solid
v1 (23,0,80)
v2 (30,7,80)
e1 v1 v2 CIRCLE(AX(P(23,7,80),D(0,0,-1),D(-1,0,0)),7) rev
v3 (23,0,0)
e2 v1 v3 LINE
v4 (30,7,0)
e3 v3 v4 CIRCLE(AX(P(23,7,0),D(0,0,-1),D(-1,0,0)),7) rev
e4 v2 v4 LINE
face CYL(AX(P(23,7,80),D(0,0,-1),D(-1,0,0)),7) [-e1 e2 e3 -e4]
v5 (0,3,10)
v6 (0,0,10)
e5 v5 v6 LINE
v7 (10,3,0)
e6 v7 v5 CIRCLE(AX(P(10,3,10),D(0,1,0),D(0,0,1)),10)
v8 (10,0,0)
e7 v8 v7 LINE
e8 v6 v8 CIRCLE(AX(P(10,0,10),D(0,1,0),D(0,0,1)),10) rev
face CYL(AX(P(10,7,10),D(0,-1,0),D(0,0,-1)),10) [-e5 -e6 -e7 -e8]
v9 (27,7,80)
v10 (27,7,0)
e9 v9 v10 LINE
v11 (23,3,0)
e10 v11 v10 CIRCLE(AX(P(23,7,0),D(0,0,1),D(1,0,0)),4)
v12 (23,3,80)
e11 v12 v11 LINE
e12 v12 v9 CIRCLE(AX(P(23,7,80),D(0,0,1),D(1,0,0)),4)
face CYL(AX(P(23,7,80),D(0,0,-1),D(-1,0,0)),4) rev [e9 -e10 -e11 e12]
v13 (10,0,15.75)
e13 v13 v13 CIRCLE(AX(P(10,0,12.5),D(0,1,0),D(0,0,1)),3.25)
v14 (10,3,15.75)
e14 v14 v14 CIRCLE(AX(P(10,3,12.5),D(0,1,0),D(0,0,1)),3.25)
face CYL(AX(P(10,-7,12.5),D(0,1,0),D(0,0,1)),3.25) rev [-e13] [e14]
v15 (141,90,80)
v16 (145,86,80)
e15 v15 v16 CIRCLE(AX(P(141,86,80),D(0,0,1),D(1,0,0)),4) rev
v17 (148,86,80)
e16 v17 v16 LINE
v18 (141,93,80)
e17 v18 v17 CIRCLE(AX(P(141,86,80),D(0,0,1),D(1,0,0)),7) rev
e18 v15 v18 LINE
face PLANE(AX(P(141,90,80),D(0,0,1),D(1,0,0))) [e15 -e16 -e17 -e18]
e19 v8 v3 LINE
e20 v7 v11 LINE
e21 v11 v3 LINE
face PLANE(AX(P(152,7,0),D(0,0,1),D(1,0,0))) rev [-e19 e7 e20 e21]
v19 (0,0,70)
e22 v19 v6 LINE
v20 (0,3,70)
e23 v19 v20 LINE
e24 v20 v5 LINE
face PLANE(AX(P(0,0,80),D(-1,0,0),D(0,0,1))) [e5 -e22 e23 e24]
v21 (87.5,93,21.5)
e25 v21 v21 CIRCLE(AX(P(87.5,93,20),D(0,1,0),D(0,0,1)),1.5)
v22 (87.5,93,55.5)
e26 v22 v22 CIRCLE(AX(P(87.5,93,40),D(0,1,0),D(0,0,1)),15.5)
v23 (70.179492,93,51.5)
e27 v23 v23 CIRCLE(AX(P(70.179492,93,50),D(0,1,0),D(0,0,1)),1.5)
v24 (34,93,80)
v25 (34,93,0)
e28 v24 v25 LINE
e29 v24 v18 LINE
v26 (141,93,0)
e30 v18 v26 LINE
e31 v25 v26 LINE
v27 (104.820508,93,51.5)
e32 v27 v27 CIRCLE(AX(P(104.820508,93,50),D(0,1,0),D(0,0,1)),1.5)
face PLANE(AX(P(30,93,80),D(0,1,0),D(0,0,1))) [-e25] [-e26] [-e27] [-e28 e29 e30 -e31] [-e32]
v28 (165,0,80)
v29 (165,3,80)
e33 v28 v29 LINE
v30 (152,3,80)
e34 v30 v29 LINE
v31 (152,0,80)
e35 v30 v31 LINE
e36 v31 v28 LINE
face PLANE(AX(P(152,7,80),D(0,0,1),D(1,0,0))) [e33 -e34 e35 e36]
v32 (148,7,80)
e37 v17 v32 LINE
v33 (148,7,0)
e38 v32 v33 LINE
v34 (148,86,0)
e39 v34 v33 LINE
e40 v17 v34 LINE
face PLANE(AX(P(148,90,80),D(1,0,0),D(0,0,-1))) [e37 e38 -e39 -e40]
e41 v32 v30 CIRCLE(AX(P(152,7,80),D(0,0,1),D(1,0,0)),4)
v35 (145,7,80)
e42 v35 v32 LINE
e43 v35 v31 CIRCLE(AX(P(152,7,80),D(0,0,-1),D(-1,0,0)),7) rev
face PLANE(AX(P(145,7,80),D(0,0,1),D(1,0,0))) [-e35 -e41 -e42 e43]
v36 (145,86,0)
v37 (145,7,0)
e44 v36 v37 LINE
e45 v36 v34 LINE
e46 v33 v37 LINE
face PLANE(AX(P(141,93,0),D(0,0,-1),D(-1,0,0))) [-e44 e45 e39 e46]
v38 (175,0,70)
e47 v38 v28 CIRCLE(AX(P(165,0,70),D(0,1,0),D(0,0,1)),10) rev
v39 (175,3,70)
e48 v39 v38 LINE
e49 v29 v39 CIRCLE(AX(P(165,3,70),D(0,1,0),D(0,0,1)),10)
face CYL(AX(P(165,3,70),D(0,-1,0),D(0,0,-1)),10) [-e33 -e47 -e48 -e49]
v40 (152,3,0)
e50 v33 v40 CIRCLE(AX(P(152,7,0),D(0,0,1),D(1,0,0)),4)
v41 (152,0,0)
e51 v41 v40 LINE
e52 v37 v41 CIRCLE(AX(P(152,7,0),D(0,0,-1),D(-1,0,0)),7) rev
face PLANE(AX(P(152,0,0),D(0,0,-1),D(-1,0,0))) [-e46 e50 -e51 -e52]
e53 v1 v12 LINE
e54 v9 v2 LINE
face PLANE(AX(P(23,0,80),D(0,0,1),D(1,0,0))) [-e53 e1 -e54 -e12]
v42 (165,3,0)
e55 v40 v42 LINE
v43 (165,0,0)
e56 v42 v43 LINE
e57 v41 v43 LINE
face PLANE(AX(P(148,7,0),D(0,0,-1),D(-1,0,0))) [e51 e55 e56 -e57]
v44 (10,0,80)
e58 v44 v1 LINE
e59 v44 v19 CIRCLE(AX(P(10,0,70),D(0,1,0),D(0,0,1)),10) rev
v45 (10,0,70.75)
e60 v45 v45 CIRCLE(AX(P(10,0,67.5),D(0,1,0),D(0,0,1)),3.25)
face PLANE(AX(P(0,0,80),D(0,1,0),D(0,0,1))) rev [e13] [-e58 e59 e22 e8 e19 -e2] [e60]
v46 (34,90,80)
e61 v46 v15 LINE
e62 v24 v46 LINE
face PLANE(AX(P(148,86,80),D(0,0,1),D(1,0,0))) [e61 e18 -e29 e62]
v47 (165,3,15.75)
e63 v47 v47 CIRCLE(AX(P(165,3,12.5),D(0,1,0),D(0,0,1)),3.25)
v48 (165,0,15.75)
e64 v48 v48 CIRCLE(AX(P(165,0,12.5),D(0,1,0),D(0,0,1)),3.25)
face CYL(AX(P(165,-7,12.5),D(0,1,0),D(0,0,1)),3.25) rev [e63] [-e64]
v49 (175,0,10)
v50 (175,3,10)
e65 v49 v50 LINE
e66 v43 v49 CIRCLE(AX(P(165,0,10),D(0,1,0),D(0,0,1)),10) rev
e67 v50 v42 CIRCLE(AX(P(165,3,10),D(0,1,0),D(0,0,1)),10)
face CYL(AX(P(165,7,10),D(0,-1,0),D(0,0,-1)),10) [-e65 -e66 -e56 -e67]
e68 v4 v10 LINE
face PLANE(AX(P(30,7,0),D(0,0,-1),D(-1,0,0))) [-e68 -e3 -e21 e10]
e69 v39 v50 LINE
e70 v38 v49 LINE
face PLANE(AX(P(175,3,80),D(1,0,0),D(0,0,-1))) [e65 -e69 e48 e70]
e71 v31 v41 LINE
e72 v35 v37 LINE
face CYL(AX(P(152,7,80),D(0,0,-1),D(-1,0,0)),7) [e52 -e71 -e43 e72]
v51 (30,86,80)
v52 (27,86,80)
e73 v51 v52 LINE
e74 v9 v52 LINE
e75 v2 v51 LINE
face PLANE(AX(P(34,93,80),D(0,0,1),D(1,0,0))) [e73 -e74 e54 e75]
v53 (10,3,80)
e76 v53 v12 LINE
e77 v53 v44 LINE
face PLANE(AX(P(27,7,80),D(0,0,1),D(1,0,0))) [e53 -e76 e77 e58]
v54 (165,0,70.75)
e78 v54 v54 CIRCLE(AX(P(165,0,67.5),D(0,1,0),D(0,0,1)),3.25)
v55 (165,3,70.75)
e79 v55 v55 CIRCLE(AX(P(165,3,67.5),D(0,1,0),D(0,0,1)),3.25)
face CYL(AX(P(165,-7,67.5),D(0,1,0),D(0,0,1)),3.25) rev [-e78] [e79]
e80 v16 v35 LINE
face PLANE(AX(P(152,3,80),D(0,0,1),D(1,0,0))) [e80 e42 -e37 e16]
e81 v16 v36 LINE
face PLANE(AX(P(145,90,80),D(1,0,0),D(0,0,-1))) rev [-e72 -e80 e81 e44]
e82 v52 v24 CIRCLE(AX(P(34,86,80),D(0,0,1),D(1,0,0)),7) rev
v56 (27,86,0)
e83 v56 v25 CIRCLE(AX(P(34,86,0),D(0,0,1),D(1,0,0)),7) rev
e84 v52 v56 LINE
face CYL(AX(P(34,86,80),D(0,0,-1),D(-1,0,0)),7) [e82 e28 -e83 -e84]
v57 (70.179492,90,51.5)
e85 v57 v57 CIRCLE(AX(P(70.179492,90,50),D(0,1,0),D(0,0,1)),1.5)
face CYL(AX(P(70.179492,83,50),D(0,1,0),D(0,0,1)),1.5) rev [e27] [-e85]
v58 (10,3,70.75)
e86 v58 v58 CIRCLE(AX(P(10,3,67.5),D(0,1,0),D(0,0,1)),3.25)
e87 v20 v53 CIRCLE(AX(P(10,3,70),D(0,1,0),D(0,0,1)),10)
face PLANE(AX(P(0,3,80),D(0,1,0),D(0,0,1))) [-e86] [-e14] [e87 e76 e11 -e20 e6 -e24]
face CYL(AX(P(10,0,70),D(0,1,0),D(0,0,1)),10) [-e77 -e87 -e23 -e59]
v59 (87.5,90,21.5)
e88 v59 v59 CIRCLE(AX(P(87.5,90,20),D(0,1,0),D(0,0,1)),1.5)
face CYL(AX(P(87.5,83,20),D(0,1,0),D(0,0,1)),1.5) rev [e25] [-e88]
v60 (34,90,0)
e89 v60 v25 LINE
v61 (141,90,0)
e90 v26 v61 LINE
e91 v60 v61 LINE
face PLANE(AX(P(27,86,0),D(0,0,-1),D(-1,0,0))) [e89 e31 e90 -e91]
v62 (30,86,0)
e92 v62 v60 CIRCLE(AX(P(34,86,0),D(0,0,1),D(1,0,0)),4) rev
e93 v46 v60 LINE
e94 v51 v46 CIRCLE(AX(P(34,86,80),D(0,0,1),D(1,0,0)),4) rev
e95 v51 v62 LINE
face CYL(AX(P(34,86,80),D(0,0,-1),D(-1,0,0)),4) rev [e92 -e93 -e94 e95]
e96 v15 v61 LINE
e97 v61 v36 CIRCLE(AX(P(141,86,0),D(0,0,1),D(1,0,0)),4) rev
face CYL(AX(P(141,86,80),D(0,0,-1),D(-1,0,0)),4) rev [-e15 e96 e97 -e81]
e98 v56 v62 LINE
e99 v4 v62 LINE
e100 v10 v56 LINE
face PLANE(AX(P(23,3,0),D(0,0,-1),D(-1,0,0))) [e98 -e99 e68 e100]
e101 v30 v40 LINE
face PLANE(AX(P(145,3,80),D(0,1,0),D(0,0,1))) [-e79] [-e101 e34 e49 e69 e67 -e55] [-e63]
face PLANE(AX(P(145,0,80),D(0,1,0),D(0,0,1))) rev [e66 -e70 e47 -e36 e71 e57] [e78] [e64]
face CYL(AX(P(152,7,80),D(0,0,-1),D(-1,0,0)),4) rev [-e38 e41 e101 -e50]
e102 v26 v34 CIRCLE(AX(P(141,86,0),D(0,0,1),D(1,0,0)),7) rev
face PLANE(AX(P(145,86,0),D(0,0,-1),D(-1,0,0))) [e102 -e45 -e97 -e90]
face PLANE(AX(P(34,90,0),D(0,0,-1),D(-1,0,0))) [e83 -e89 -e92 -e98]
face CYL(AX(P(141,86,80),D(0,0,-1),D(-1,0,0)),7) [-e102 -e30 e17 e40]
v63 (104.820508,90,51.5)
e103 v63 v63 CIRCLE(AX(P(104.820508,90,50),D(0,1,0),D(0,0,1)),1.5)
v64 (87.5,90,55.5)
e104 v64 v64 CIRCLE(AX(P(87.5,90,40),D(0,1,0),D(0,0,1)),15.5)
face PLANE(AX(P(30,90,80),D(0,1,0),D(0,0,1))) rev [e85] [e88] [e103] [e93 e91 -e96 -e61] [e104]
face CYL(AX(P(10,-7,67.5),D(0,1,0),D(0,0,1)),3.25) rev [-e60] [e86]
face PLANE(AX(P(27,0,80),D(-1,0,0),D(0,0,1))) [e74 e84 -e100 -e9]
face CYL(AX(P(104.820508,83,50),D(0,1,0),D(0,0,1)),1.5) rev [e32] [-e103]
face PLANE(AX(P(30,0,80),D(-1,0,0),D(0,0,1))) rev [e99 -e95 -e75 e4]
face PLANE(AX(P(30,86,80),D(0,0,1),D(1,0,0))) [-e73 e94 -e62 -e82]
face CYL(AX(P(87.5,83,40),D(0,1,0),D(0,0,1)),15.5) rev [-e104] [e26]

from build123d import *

# Parameters (mm, degrees)
TABAN_FLAN_1_DEPTH    = 80
IZIM2_R               = 1.5
KES_EKSTR_ZYON1_DEPTH = 10
IZIM3_R               = 15.5
KES_EKSTR_ZYON2_DEPTH = 10
RADYUS1_R             = 10
IZIM4_R               = 3.25
KES_EKSTR_ZYON3_DEPTH = 10


# Read off the part's stored shape, not the designer's step: Taban-Flanş1
with BuildPart() as part:
    # Taban-Flanş1 outline → Taban-Flanş1 (new body)
    with BuildSketch(Plane.XY):
        with BuildLine():
            Line((152, 0), (175, 0))
            Line((175, 0), (175, 3))
            Line((175, 3), (152, 3))
            ThreePointArc((152, 3), (149.171572875, 4.171572875), (148, 7))
            Line((148, 7), (148, 86))
            ThreePointArc((148, 86), (145.949747468, 90.949747468), (141, 93))
            Line((141, 93), (34, 93))
            ThreePointArc((34, 93), (29.050252532, 90.949747468), (27, 86))
            Line((27, 86), (27, 7))
            ThreePointArc((27, 7), (25.828427125, 4.171572875), (23, 3))
            Line((23, 3), (0, 3))
            Line((0, 3), (0, 0))
            Line((0, 0), (23, 0))
            ThreePointArc((23, 0), (27.949747468, 2.050252532), (30, 7))
            Line((30, 7), (30, 86))
            ThreePointArc((30, 86), (31.171572875, 88.828427125), (34, 90))
            Line((34, 90), (141, 90))
            ThreePointArc((141, 90), (143.828427125, 88.828427125), (145, 86))
            Line((145, 86), (145, 7))
            ThreePointArc((145, 7), (147.050252532, 2.050252532), (152, 0))
        make_face()
    extrude(amount=TABAN_FLAN_1_DEPTH)

    # Çizim2 → Kes-Ekstrüzyon1 (cut)
    with BuildSketch(Plane(origin=(0, 93, 0), x_dir=(1, 0, 0), z_dir=(0, 1, 0))):
        with Locations(Location((87.5, -20, 0), (0, 0, 270))):
            Circle(IZIM2_R)
        with Locations(Location((104.820508076, -50, 0), (0, 0, 270))):
            Circle(IZIM2_R)
        with Locations(Location((70.179491924, -50, 0), (0, 0, 270))):
            Circle(IZIM2_R)
    extrude(amount=-KES_EKSTR_ZYON1_DEPTH, mode=Mode.SUBTRACT)

    # Çizim3 → Kes-Ekstrüzyon2 (cut)
    with BuildSketch(Plane(origin=(0, 93, 0), x_dir=(1, 0, 0), z_dir=(0, 1, 0))):
        with Locations(Location((87.5, -40, 0), (0, 0, 270))):
            Circle(IZIM3_R)
    extrude(amount=-KES_EKSTR_ZYON2_DEPTH, mode=Mode.SUBTRACT)

    # Radyus1
    radyus1_edges = [part.edges().sort_by_distance(p)[0] for p in [
        (0, 1.5, 0),
        (175, 1.5, 0),
        (0, 1.5, 80),
        (175, 1.5, 80),
    ]]
    fillet(radyus1_edges, radius=RADYUS1_R)

    # Çizim4 → Kes-Ekstrüzyon3 (cut)
    with BuildSketch(Plane(origin=(0, 3, 0), x_dir=(1, 0, 0), z_dir=(0, 1, 0))):
        with Locations(Location((10, -12.5, 0), (0, 0, 270))):
            Circle(IZIM4_R)
        with Locations(Location((10, -67.5, 0), (0, 0, 270))):
            Circle(IZIM4_R)
        with Locations(Location((165, -67.5, 0), (0, 0, 270))):
            Circle(IZIM4_R)
        with Locations(Location((165, -12.5, 0), (0, 0, 270))):
            Circle(IZIM4_R)
    extrude(amount=-KES_EKSTR_ZYON3_DEPTH, mode=Mode.SUBTRACT)


solid = part.part
